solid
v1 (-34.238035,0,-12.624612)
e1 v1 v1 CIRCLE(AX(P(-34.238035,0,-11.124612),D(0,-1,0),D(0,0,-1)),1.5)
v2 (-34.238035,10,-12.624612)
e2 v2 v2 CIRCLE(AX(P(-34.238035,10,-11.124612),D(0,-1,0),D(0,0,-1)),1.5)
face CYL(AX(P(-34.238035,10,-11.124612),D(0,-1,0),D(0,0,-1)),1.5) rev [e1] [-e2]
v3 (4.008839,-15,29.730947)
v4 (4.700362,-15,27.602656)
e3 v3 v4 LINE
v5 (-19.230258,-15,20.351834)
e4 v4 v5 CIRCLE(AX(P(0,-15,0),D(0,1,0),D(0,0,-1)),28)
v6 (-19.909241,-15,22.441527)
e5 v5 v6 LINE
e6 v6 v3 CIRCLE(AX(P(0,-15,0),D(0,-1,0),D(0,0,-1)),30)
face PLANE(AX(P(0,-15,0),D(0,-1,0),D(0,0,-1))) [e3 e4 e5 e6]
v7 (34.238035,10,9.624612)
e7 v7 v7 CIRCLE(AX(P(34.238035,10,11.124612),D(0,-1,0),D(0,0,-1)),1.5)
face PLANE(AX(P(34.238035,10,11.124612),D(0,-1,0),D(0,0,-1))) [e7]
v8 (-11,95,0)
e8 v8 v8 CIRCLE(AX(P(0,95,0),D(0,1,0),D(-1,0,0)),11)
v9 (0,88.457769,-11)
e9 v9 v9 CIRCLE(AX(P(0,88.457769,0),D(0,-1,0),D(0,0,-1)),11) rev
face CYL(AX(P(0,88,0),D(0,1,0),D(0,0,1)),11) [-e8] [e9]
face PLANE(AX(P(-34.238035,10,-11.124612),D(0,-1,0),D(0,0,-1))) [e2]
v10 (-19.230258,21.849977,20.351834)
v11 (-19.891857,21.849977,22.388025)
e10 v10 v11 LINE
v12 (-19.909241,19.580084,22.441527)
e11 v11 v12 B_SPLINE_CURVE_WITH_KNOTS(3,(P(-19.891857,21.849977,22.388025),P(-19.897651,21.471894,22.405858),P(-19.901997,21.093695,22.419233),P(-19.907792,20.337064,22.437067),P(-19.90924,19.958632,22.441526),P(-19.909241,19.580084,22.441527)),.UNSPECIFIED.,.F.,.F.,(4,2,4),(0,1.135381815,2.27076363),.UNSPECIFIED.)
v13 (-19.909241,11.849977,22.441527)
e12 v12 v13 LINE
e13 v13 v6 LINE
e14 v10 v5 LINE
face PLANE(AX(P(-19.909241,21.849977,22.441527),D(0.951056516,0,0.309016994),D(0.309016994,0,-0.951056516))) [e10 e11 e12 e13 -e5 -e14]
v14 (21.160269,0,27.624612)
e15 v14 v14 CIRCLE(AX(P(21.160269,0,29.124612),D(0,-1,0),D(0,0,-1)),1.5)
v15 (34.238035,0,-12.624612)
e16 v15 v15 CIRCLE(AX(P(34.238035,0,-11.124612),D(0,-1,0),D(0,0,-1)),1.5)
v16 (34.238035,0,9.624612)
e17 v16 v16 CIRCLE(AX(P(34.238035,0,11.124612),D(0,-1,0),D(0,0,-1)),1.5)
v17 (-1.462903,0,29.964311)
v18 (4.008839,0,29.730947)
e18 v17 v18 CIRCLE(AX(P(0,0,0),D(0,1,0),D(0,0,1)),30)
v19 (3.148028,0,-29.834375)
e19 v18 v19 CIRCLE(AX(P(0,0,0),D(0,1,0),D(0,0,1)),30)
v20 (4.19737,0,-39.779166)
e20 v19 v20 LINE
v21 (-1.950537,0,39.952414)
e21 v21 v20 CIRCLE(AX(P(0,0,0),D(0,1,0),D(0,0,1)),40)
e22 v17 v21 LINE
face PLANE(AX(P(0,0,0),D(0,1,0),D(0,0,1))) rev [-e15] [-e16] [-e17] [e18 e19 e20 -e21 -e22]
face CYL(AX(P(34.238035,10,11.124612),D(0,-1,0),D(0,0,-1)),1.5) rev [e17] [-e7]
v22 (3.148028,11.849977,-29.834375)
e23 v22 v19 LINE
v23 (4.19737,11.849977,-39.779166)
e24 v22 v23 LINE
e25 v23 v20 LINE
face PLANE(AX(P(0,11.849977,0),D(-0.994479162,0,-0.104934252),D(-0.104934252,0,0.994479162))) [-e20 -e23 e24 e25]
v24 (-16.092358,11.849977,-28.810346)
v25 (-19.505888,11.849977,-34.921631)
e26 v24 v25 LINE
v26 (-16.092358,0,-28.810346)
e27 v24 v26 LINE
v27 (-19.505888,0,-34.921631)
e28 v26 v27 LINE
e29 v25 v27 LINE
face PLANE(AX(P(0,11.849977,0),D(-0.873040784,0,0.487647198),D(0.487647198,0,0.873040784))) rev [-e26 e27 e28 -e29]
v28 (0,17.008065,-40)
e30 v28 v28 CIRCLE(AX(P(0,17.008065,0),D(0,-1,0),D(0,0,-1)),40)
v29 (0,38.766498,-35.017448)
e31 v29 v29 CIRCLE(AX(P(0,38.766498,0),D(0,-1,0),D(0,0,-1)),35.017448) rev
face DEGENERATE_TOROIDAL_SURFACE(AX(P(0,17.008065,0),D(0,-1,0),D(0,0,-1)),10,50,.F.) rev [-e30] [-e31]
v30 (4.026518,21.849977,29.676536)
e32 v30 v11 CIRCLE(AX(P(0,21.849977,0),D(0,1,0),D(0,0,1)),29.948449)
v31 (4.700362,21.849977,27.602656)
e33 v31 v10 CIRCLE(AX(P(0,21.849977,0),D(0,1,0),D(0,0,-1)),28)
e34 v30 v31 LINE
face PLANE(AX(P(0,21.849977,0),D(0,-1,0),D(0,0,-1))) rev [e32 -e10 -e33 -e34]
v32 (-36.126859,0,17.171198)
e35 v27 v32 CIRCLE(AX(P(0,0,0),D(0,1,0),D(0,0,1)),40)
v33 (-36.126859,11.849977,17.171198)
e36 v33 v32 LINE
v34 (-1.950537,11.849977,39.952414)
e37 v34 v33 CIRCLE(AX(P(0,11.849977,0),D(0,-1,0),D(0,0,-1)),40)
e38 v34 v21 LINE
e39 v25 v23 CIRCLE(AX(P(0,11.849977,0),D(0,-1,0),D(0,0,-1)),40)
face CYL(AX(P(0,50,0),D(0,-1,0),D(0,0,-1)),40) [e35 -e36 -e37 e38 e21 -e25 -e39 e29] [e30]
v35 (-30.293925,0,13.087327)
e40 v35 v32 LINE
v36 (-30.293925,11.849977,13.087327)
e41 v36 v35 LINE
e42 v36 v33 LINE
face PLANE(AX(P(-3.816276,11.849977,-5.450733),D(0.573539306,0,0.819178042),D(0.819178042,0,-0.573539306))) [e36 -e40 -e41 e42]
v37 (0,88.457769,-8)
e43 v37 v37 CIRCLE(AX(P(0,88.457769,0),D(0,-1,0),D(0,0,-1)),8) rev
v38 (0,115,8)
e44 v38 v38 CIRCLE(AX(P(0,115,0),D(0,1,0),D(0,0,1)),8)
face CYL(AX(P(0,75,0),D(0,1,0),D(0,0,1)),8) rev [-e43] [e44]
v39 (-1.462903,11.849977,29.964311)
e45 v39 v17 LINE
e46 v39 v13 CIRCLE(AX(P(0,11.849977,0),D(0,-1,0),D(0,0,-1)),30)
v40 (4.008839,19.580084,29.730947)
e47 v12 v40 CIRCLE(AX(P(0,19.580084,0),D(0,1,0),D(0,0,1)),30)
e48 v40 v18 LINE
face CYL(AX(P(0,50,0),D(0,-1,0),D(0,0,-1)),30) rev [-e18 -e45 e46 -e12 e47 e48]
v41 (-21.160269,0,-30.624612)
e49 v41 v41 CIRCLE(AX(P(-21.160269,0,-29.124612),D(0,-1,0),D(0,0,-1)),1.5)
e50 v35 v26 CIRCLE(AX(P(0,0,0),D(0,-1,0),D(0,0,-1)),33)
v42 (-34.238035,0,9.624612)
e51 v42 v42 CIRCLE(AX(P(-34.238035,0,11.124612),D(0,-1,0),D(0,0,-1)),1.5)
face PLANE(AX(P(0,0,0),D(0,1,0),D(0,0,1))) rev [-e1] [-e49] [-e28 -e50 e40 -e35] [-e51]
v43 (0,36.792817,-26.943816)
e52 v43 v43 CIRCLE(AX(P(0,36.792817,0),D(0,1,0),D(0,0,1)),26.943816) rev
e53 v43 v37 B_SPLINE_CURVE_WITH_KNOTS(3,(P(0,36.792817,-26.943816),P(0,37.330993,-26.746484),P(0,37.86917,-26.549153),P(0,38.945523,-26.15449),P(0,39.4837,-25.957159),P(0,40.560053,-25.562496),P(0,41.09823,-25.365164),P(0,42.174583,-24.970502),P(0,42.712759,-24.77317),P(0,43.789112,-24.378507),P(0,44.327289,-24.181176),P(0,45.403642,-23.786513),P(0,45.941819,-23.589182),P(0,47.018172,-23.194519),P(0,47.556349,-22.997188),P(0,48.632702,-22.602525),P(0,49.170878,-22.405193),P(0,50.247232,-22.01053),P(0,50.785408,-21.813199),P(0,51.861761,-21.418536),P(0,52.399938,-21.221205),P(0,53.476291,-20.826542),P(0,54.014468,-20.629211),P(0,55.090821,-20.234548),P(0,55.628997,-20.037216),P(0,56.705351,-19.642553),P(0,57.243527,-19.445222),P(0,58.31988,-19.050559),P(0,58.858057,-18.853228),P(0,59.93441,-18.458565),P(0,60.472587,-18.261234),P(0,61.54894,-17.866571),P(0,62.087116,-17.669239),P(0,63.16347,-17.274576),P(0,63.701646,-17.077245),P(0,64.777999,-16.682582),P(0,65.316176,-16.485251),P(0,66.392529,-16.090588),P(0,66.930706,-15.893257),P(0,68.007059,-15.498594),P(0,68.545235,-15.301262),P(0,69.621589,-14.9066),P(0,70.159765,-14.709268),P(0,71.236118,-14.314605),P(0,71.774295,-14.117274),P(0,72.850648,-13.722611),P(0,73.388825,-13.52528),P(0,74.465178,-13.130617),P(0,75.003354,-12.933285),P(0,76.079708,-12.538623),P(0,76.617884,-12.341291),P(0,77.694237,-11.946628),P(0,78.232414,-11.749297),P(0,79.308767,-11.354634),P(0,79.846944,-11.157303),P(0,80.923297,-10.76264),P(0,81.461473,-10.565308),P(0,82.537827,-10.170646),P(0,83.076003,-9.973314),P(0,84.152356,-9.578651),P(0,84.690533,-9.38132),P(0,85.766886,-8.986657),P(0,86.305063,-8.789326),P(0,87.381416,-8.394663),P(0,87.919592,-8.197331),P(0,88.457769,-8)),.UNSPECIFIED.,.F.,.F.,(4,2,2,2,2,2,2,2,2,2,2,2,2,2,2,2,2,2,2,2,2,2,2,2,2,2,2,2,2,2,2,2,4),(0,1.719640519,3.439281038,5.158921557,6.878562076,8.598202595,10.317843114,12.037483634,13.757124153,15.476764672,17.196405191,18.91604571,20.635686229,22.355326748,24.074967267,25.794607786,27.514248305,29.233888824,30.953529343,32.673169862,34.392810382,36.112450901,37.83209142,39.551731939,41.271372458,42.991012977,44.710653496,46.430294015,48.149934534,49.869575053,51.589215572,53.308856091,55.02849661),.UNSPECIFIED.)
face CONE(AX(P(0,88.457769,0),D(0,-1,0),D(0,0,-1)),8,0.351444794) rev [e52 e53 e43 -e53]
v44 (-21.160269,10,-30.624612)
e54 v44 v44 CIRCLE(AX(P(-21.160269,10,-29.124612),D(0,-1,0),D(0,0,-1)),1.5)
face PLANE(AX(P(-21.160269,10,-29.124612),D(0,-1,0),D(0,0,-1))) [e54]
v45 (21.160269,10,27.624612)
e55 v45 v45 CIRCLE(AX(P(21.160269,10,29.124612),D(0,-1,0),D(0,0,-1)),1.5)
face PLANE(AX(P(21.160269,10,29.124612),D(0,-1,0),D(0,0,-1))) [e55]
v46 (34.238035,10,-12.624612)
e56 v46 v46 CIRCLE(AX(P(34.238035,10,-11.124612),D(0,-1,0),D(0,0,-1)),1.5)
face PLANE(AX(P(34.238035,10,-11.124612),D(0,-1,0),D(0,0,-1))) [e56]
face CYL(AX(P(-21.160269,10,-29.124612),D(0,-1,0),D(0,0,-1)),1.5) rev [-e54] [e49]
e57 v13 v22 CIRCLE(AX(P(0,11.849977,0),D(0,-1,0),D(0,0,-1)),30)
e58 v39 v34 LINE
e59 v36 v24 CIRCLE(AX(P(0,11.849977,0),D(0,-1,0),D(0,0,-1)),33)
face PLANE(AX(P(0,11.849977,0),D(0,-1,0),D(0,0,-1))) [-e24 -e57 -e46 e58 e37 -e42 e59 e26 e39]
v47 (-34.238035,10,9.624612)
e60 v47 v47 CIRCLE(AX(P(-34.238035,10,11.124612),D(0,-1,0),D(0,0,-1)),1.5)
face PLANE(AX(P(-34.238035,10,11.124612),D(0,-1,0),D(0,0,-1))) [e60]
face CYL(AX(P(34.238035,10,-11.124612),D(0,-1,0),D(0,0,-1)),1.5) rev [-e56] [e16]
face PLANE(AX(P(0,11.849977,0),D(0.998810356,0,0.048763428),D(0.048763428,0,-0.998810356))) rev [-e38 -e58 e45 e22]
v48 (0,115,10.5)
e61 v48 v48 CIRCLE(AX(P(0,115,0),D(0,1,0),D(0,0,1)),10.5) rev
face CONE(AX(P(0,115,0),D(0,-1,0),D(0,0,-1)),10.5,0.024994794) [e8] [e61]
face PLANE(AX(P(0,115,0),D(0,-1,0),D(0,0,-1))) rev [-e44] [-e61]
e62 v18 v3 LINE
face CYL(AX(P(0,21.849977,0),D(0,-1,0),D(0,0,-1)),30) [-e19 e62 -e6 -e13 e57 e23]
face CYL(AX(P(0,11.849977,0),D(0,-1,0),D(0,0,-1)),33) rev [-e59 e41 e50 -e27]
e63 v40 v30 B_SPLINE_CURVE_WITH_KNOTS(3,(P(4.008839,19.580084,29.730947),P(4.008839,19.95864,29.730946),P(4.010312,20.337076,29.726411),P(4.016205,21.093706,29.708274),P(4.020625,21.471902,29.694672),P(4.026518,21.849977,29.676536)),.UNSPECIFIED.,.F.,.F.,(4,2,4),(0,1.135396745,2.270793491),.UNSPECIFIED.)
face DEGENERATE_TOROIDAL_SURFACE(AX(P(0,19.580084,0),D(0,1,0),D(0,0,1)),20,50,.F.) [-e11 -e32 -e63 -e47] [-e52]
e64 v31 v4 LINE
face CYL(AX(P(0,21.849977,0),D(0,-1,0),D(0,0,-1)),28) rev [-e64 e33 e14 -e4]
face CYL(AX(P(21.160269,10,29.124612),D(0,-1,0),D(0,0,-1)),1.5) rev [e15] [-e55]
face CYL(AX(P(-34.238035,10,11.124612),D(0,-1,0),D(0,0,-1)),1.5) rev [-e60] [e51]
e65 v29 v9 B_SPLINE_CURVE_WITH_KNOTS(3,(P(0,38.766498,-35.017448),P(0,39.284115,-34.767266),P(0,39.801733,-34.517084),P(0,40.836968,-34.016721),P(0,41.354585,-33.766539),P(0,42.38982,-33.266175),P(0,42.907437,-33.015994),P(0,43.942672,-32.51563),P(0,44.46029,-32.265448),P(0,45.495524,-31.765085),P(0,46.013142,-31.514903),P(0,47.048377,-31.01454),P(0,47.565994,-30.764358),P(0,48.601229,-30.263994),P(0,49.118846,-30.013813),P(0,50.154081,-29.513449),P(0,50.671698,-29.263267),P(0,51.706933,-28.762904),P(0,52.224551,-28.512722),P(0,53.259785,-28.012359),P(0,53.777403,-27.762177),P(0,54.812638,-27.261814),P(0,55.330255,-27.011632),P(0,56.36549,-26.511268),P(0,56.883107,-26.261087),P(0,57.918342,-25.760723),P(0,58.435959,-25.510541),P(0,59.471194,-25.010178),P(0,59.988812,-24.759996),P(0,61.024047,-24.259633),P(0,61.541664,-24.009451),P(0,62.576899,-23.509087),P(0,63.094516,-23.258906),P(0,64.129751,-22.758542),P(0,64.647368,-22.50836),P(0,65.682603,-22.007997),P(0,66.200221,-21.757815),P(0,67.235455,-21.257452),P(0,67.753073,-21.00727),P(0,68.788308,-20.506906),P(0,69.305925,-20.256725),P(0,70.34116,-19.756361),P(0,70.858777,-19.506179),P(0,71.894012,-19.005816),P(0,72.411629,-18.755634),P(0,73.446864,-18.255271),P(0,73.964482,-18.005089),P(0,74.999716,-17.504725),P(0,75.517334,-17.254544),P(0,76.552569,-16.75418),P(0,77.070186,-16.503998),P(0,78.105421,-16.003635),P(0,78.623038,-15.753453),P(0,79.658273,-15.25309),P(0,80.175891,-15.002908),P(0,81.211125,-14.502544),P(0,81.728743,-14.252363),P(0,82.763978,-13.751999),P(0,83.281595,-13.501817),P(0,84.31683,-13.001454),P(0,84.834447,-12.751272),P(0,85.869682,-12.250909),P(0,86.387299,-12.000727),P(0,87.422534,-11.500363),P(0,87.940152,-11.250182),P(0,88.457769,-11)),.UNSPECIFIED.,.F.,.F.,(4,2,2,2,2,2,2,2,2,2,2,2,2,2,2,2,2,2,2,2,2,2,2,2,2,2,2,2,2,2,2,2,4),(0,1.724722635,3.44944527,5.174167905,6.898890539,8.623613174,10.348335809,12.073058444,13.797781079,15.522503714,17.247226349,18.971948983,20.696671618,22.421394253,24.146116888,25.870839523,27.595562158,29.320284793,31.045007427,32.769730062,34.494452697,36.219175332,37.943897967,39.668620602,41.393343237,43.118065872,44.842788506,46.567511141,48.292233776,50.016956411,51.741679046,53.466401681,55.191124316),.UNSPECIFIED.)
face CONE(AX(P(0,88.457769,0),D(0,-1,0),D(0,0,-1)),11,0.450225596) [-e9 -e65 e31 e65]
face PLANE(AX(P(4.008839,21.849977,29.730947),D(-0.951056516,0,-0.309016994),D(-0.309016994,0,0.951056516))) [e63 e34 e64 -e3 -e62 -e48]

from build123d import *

# Parameters (mm, degrees)
ESBO_O1_R                     = 40
ESBO_O1_R_2                   = 30
RESSALTO_EXTRUS_O1_DEPTH      = 50
ESBO_O2_R                     = 1.500000000000004
ESBO_O2_R_2                   = 1.4999999999999962
ESBO_O2_R_3                   = 1.5
ESBO_O2_R_4                   = 1.500000000000002
ESBO_O2_R_5                   = 1.5000000000000018
CORTE_EXTRUS_O1_DEPTH         = 10
CORTE_EXTRUS_O2_DEPTH         = 11.84997677
RESSALTO_EXTRUS_O2_DEPTH      = 26.849976769999998
RESSALTO_EXTRUS_O2_DEPTH_BACK = 10
REVOLU_O1_ANGLE               = 180.0000000000004
RESSALTO_EXTRUS_O5_DEPTH      = 5
RESSALTO_EXTRUS_O5_DEPTH_BACK = 2
ESBO_O10_R                    = 11
ESBO_O13_R                    = 8
CORTE_EXTRUS_O4_DEPTH         = 40
CORTE_EXTRUS_O5_DEPTH         = 120
FILETE1_R                     = 50
FILETE2_R                     = 50


# Read off the part's stored shape, not the designer's step: Limites1, Limites2, Limites-Corte1
with BuildPart() as part:
    # Esboço1 → Ressalto-extrusão1 (new body)
    with BuildSketch(Plane(origin=(0, 0, 0), x_dir=(1, 0, 0), z_dir=(0, 1, 0))):
        with Locations(Location((0, 0, 0), (0, 0, 270))):
            Circle(ESBO_O1_R)
        with Locations(Location((0, 0, 0), (0, 0, 270))):
            Circle(ESBO_O1_R_2, mode=Mode.SUBTRACT)
    extrude(amount=RESSALTO_EXTRUS_O1_DEPTH)

    # Esboço2 → Corte-extrusão1 (cut)
    with BuildSketch(Plane(origin=(0, 0, 0), x_dir=(-1, 0, 0), z_dir=(0, -1, 0))):
        with Locations(Location((-21.160269082529076, -29.124611797498083, 0), (0, 0, 90))):
            Circle(ESBO_O2_R)
        with Locations(Location((-34.23803458662555, -11.124611797498012, 0), (0, 0, 90))):
            Circle(ESBO_O2_R_2)
        with Locations(Location((-34.23803458662548, 11.124611797498257, 0), (0, 0, 90))):
            Circle(ESBO_O2_R_3)
        with Locations(Location((21.16026908252929, 29.124611797497916, 0), (0, 0, 90))):
            Circle(ESBO_O2_R_4)
        with Locations(Location((34.23803458662564, 11.124611797497778, 0), (0, 0, 90))):
            Circle(ESBO_O2_R_5)
        with Locations(Location((34.2380345866254, -11.124611797498495, 0), (0, 0, 90))):
            Circle(ESBO_O2_R_4)
    extrude(amount=-CORTE_EXTRUS_O1_DEPTH, mode=Mode.SUBTRACT)

    # Esboço3 → Corte-extrusão2 (cut)
    with BuildSketch(Plane(origin=(0, 0, 0), x_dir=(-1, 0, 0), z_dir=(0, -1, 0))):
        with BuildLine():
            ThreePointArc((30.293924667807104, -13.087327008263706), (31.253408488730912, 10.59360457240701), (16.0923575286481, 28.810345870366824))
            Line((16.092357528648105, 28.810345870366824), (19.505887913512822, 34.921631358020406))
            ThreePointArc((19.505887913512836, 34.9216313580204), (8.030354378354186, 39.18562757642205), (-4.197370072970371, 39.77916646274194))
            Line((-4.19737007297038, 39.779166462741934), (-3.1480275547272187, 29.83437484705651))
            ThreePointArc((-3.148027554727219, 29.834374847056512), (29.911212101346653, 2.3063804170720696), (1.462902849126346, -29.964310692122016))
            Line((1.4629028491263463, -29.96431069212202), (1.9505371321681024, -39.952414256162704))
            ThreePointArc((1.9505371321681024, -39.952414256162704), (22.185986251539575, -33.283359416478625), (36.12685933386897, -17.171197822832383))
            Line((36.12685933386898, -17.171197822832383), (30.293924667807104, -13.087327008263708))
        make_face()
    extrude(amount=-CORTE_EXTRUS_O2_DEPTH, mode=Mode.SUBTRACT)

    # Esboço4 → Ressalto-extrusão2 (add, two sides: drawn at the far end of the back side and taken through both)
    with BuildSketch(Plane(origin=(0, 11.84997677, 0), x_dir=(-1, 0, 0), z_dir=(0, -1, 0)).offset(-RESSALTO_EXTRUS_O2_DEPTH_BACK)):
        with BuildLine():
            Line((-4.008838628941714, -29.730947056007228), (-4.700362462642585, -27.60265553746198))
            ThreePointArc((-4.700362462642585, -27.60265553746198), (-8.119302431706847, 26.796957439651234), (19.23025849893697, -20.351834267801586))
            Line((19.23025849893697, -20.351834267801586), (19.909240802048483, -22.441526924121003))
            ThreePointArc((19.909240802048483, -22.441526924121003), (-8.745833795666464, 28.696870756557733), (-4.008838628941714, -29.730947056007228))
        make_face()
    extrude(amount=RESSALTO_EXTRUS_O2_DEPTH + RESSALTO_EXTRUS_O2_DEPTH_BACK)

    # Esboço9 → Revolução1 (revolve)
    with BuildSketch(Plane(origin=(0, 50, 0), x_dir=(1, 0, 0), z_dir=(0, 1, 0))):
        with BuildLine():
            Line((-40, 0), (-30, 0))
            ThreePointArc((-30, 0), (1.84e-15, 30), (30, 0))
            Line((30, 0), (40, 0))
            ThreePointArc((40, 0), (2.45e-15, 40), (-40, 0))
        make_face()
    revolve(axis=Axis((-40, 50, 0), (1, 0, 0)), revolution_arc=REVOLU_O1_ANGLE)

    # Esboço10 → Ressalto-extrusão5 (add, two sides: drawn at the far end of the back side and taken through both)
    with BuildSketch(Plane(origin=(0, 90, 0), x_dir=(1, 0, 0), z_dir=(0, 1, 0)).offset(-RESSALTO_EXTRUS_O5_DEPTH_BACK)):
        with Locations(Location((0, 0, 0), (0, 0, 270))):
            Circle(ESBO_O10_R)
    extrude(amount=RESSALTO_EXTRUS_O5_DEPTH + RESSALTO_EXTRUS_O5_DEPTH_BACK)

    # Limites1 outline → Limites1 (revolve)
    with BuildSketch(Plane.XY):
        Polygon((11, 95), (10.5, 115), (0, 115), (0, 95), align=None)
    revolve(axis=Axis((0, 0, 0), (0, 1, 0)))

    # Esboço13 → Corte-extrusão4 (cut)
    with BuildSketch(Plane(origin=(0, 115, 0), x_dir=(1, 0, 0), z_dir=(0, 1, 0))):
        with Locations(Location((0, 0, 0), (0, 0, 270))):
            Circle(ESBO_O13_R)
    extrude(amount=-CORTE_EXTRUS_O4_DEPTH, mode=Mode.SUBTRACT)

    # Esboço14 → Corte-extrusão5 (cut)
    with BuildSketch(Plane(origin=(61.11285487653572, 0, -34.135303848647126), x_dir=(-0.487647197837817, 0, -0.8730407839505122), z_dir=(0.8730407839505123, 0, -0.48764719783781707))):
        Polygon((54.65634856725553, 88.45776904605881), (-53.65162953624658, 88.45776904605881), (-53.651629536246595, 28.457769046058818), (54.65634856725555, 28.457769046058818), align=None)
    extrude(amount=-CORTE_EXTRUS_O5_DEPTH, mode=Mode.SUBTRACT)


with BuildPart() as corte_extrus_o5_piece_1:
    # of the separate pieces the step leaves, piece 1, a body of its own (corte_extrus_o5_pieces)
    add(part.part.solids().sort_by_distance((0, 0, 40))[0])



with BuildPart() as corte_extrus_o5_piece_2:
    # of the separate pieces the step leaves, piece 2, a body of its own (corte_extrus_o5_pieces)
    add(part.part.solids().sort_by_distance((0, 88.457769046, 11))[0])


with BuildPart() as corte_extrus_o5_piece_1_1:
    add(corte_extrus_o5_piece_1.part)

    add(corte_extrus_o5_piece_2.part)  # Limites2 merges Corte-extrusão5 piece 2
    # Limites2 outline → Limites2 (revolve)
    with BuildSketch(Plane.XY):
        Polygon((0, 88.457769046), (0, 28.457769046), (40, 28.457769046), (11, 88.457769046), align=None)
    revolve(axis=Axis((0, 0, 0), (0, 1, 0)))

    # Limites-Corte1 outline → Limites-Corte1 (revolve, cut)
    with BuildSketch(Plane.XY):
        Polygon((30, 28.457769046), (8, 88.457769046), (0, 88.457769046), (0, 28.457769046), align=None)
    revolve(axis=Axis((0, 0, 0), (0, 1, 0)), mode=Mode.SUBTRACT)

    # Filete1
    # the kernel refuses this fillet: 50 mm, written as the material it takes off along each edge
    with BuildSketch(Plane(origin=(0, 28.457769046058818, 0), x_dir=(-1.8e-16, 0, 1), z_dir=(1, 0, 1.8e-16))) as filete1_piece_1:
        with BuildLine():
            CenterArc((40 - FILETE1_R, FILETE1_R * 0.228994080214), FILETE1_R, 334.2039735055, 25.79602649449996)
            Line((40, FILETE1_R * 0.228994080214), (40, 0))
            Line((40, 0), (40 - FILETE1_R * 0.0996510471581, -FILETE1_R * 0.206174580326))
        make_face()
    revolve(axis=Axis((0, 28.457769046058818, 0), (0, -1, 0)), revolution_arc=270, mode=Mode.SUBTRACT)
    with BuildSketch(Plane(origin=(0, 28.457769046058818, 0), x_dir=(1, 0, 0), z_dir=(0, 0, -1))) as filete1_piece_2:
        with BuildLine():
            CenterArc((40 - FILETE1_R, FILETE1_R * 0.228994080214), FILETE1_R, 334.2039735055, 25.79602649449996)
            Line((40, FILETE1_R * 0.228994080214), (40, 0))
            Line((40, 0), (40 - FILETE1_R * 0.0996510471581, -FILETE1_R * 0.206174580326))
        make_face()
    revolve(axis=Axis((0, 28.457769046058818, 0), (0, -1, 0)), revolution_arc=90, mode=Mode.SUBTRACT)

    # Filete2
    # the kernel refuses this fillet: 50 mm, written as the material it adds along each edge
    with BuildSketch(Plane(origin=(0, 28.457769046058818, 0), x_dir=(-1.8e-16, 0, 1), z_dir=(1, 0, 1.8e-16))) as filete2_piece_1:
        with BuildLine():
            CenterArc((30 - FILETE2_R, FILETE2_R * 0.177553692487), FILETE2_R, 339.86369657175186, 20.136303428248137)
            Line((30.000000000000007, FILETE2_R * 0.177553692487), (30, 0))
            Line((30, 0), (30 - FILETE2_R * 0.0611236841134, -FILETE2_R * 0.166700956672))
        make_face()
    revolve(axis=Axis((0, 28.457769046058818, 0), (0, -1, 0)), revolution_arc=270)
    with BuildSketch(Plane(origin=(0, 28.457769046058818, 0), x_dir=(1, 0, 0), z_dir=(0, 0, -1))) as filete2_piece_2:
        with BuildLine():
            CenterArc((30 - FILETE2_R, FILETE2_R * 0.177553692487), FILETE2_R, 339.86369657175186, 20.136303428248137)
            Line((30.000000000000007, FILETE2_R * 0.177553692487), (30, 0))
            Line((30, 0), (30 - FILETE2_R * 0.0611236841134, -FILETE2_R * 0.166700956672))
        make_face()
    revolve(axis=Axis((0, 28.457769046058818, 0), (0, -1, 0)), revolution_arc=90)


solid = corte_extrus_o5_piece_1_1.part
